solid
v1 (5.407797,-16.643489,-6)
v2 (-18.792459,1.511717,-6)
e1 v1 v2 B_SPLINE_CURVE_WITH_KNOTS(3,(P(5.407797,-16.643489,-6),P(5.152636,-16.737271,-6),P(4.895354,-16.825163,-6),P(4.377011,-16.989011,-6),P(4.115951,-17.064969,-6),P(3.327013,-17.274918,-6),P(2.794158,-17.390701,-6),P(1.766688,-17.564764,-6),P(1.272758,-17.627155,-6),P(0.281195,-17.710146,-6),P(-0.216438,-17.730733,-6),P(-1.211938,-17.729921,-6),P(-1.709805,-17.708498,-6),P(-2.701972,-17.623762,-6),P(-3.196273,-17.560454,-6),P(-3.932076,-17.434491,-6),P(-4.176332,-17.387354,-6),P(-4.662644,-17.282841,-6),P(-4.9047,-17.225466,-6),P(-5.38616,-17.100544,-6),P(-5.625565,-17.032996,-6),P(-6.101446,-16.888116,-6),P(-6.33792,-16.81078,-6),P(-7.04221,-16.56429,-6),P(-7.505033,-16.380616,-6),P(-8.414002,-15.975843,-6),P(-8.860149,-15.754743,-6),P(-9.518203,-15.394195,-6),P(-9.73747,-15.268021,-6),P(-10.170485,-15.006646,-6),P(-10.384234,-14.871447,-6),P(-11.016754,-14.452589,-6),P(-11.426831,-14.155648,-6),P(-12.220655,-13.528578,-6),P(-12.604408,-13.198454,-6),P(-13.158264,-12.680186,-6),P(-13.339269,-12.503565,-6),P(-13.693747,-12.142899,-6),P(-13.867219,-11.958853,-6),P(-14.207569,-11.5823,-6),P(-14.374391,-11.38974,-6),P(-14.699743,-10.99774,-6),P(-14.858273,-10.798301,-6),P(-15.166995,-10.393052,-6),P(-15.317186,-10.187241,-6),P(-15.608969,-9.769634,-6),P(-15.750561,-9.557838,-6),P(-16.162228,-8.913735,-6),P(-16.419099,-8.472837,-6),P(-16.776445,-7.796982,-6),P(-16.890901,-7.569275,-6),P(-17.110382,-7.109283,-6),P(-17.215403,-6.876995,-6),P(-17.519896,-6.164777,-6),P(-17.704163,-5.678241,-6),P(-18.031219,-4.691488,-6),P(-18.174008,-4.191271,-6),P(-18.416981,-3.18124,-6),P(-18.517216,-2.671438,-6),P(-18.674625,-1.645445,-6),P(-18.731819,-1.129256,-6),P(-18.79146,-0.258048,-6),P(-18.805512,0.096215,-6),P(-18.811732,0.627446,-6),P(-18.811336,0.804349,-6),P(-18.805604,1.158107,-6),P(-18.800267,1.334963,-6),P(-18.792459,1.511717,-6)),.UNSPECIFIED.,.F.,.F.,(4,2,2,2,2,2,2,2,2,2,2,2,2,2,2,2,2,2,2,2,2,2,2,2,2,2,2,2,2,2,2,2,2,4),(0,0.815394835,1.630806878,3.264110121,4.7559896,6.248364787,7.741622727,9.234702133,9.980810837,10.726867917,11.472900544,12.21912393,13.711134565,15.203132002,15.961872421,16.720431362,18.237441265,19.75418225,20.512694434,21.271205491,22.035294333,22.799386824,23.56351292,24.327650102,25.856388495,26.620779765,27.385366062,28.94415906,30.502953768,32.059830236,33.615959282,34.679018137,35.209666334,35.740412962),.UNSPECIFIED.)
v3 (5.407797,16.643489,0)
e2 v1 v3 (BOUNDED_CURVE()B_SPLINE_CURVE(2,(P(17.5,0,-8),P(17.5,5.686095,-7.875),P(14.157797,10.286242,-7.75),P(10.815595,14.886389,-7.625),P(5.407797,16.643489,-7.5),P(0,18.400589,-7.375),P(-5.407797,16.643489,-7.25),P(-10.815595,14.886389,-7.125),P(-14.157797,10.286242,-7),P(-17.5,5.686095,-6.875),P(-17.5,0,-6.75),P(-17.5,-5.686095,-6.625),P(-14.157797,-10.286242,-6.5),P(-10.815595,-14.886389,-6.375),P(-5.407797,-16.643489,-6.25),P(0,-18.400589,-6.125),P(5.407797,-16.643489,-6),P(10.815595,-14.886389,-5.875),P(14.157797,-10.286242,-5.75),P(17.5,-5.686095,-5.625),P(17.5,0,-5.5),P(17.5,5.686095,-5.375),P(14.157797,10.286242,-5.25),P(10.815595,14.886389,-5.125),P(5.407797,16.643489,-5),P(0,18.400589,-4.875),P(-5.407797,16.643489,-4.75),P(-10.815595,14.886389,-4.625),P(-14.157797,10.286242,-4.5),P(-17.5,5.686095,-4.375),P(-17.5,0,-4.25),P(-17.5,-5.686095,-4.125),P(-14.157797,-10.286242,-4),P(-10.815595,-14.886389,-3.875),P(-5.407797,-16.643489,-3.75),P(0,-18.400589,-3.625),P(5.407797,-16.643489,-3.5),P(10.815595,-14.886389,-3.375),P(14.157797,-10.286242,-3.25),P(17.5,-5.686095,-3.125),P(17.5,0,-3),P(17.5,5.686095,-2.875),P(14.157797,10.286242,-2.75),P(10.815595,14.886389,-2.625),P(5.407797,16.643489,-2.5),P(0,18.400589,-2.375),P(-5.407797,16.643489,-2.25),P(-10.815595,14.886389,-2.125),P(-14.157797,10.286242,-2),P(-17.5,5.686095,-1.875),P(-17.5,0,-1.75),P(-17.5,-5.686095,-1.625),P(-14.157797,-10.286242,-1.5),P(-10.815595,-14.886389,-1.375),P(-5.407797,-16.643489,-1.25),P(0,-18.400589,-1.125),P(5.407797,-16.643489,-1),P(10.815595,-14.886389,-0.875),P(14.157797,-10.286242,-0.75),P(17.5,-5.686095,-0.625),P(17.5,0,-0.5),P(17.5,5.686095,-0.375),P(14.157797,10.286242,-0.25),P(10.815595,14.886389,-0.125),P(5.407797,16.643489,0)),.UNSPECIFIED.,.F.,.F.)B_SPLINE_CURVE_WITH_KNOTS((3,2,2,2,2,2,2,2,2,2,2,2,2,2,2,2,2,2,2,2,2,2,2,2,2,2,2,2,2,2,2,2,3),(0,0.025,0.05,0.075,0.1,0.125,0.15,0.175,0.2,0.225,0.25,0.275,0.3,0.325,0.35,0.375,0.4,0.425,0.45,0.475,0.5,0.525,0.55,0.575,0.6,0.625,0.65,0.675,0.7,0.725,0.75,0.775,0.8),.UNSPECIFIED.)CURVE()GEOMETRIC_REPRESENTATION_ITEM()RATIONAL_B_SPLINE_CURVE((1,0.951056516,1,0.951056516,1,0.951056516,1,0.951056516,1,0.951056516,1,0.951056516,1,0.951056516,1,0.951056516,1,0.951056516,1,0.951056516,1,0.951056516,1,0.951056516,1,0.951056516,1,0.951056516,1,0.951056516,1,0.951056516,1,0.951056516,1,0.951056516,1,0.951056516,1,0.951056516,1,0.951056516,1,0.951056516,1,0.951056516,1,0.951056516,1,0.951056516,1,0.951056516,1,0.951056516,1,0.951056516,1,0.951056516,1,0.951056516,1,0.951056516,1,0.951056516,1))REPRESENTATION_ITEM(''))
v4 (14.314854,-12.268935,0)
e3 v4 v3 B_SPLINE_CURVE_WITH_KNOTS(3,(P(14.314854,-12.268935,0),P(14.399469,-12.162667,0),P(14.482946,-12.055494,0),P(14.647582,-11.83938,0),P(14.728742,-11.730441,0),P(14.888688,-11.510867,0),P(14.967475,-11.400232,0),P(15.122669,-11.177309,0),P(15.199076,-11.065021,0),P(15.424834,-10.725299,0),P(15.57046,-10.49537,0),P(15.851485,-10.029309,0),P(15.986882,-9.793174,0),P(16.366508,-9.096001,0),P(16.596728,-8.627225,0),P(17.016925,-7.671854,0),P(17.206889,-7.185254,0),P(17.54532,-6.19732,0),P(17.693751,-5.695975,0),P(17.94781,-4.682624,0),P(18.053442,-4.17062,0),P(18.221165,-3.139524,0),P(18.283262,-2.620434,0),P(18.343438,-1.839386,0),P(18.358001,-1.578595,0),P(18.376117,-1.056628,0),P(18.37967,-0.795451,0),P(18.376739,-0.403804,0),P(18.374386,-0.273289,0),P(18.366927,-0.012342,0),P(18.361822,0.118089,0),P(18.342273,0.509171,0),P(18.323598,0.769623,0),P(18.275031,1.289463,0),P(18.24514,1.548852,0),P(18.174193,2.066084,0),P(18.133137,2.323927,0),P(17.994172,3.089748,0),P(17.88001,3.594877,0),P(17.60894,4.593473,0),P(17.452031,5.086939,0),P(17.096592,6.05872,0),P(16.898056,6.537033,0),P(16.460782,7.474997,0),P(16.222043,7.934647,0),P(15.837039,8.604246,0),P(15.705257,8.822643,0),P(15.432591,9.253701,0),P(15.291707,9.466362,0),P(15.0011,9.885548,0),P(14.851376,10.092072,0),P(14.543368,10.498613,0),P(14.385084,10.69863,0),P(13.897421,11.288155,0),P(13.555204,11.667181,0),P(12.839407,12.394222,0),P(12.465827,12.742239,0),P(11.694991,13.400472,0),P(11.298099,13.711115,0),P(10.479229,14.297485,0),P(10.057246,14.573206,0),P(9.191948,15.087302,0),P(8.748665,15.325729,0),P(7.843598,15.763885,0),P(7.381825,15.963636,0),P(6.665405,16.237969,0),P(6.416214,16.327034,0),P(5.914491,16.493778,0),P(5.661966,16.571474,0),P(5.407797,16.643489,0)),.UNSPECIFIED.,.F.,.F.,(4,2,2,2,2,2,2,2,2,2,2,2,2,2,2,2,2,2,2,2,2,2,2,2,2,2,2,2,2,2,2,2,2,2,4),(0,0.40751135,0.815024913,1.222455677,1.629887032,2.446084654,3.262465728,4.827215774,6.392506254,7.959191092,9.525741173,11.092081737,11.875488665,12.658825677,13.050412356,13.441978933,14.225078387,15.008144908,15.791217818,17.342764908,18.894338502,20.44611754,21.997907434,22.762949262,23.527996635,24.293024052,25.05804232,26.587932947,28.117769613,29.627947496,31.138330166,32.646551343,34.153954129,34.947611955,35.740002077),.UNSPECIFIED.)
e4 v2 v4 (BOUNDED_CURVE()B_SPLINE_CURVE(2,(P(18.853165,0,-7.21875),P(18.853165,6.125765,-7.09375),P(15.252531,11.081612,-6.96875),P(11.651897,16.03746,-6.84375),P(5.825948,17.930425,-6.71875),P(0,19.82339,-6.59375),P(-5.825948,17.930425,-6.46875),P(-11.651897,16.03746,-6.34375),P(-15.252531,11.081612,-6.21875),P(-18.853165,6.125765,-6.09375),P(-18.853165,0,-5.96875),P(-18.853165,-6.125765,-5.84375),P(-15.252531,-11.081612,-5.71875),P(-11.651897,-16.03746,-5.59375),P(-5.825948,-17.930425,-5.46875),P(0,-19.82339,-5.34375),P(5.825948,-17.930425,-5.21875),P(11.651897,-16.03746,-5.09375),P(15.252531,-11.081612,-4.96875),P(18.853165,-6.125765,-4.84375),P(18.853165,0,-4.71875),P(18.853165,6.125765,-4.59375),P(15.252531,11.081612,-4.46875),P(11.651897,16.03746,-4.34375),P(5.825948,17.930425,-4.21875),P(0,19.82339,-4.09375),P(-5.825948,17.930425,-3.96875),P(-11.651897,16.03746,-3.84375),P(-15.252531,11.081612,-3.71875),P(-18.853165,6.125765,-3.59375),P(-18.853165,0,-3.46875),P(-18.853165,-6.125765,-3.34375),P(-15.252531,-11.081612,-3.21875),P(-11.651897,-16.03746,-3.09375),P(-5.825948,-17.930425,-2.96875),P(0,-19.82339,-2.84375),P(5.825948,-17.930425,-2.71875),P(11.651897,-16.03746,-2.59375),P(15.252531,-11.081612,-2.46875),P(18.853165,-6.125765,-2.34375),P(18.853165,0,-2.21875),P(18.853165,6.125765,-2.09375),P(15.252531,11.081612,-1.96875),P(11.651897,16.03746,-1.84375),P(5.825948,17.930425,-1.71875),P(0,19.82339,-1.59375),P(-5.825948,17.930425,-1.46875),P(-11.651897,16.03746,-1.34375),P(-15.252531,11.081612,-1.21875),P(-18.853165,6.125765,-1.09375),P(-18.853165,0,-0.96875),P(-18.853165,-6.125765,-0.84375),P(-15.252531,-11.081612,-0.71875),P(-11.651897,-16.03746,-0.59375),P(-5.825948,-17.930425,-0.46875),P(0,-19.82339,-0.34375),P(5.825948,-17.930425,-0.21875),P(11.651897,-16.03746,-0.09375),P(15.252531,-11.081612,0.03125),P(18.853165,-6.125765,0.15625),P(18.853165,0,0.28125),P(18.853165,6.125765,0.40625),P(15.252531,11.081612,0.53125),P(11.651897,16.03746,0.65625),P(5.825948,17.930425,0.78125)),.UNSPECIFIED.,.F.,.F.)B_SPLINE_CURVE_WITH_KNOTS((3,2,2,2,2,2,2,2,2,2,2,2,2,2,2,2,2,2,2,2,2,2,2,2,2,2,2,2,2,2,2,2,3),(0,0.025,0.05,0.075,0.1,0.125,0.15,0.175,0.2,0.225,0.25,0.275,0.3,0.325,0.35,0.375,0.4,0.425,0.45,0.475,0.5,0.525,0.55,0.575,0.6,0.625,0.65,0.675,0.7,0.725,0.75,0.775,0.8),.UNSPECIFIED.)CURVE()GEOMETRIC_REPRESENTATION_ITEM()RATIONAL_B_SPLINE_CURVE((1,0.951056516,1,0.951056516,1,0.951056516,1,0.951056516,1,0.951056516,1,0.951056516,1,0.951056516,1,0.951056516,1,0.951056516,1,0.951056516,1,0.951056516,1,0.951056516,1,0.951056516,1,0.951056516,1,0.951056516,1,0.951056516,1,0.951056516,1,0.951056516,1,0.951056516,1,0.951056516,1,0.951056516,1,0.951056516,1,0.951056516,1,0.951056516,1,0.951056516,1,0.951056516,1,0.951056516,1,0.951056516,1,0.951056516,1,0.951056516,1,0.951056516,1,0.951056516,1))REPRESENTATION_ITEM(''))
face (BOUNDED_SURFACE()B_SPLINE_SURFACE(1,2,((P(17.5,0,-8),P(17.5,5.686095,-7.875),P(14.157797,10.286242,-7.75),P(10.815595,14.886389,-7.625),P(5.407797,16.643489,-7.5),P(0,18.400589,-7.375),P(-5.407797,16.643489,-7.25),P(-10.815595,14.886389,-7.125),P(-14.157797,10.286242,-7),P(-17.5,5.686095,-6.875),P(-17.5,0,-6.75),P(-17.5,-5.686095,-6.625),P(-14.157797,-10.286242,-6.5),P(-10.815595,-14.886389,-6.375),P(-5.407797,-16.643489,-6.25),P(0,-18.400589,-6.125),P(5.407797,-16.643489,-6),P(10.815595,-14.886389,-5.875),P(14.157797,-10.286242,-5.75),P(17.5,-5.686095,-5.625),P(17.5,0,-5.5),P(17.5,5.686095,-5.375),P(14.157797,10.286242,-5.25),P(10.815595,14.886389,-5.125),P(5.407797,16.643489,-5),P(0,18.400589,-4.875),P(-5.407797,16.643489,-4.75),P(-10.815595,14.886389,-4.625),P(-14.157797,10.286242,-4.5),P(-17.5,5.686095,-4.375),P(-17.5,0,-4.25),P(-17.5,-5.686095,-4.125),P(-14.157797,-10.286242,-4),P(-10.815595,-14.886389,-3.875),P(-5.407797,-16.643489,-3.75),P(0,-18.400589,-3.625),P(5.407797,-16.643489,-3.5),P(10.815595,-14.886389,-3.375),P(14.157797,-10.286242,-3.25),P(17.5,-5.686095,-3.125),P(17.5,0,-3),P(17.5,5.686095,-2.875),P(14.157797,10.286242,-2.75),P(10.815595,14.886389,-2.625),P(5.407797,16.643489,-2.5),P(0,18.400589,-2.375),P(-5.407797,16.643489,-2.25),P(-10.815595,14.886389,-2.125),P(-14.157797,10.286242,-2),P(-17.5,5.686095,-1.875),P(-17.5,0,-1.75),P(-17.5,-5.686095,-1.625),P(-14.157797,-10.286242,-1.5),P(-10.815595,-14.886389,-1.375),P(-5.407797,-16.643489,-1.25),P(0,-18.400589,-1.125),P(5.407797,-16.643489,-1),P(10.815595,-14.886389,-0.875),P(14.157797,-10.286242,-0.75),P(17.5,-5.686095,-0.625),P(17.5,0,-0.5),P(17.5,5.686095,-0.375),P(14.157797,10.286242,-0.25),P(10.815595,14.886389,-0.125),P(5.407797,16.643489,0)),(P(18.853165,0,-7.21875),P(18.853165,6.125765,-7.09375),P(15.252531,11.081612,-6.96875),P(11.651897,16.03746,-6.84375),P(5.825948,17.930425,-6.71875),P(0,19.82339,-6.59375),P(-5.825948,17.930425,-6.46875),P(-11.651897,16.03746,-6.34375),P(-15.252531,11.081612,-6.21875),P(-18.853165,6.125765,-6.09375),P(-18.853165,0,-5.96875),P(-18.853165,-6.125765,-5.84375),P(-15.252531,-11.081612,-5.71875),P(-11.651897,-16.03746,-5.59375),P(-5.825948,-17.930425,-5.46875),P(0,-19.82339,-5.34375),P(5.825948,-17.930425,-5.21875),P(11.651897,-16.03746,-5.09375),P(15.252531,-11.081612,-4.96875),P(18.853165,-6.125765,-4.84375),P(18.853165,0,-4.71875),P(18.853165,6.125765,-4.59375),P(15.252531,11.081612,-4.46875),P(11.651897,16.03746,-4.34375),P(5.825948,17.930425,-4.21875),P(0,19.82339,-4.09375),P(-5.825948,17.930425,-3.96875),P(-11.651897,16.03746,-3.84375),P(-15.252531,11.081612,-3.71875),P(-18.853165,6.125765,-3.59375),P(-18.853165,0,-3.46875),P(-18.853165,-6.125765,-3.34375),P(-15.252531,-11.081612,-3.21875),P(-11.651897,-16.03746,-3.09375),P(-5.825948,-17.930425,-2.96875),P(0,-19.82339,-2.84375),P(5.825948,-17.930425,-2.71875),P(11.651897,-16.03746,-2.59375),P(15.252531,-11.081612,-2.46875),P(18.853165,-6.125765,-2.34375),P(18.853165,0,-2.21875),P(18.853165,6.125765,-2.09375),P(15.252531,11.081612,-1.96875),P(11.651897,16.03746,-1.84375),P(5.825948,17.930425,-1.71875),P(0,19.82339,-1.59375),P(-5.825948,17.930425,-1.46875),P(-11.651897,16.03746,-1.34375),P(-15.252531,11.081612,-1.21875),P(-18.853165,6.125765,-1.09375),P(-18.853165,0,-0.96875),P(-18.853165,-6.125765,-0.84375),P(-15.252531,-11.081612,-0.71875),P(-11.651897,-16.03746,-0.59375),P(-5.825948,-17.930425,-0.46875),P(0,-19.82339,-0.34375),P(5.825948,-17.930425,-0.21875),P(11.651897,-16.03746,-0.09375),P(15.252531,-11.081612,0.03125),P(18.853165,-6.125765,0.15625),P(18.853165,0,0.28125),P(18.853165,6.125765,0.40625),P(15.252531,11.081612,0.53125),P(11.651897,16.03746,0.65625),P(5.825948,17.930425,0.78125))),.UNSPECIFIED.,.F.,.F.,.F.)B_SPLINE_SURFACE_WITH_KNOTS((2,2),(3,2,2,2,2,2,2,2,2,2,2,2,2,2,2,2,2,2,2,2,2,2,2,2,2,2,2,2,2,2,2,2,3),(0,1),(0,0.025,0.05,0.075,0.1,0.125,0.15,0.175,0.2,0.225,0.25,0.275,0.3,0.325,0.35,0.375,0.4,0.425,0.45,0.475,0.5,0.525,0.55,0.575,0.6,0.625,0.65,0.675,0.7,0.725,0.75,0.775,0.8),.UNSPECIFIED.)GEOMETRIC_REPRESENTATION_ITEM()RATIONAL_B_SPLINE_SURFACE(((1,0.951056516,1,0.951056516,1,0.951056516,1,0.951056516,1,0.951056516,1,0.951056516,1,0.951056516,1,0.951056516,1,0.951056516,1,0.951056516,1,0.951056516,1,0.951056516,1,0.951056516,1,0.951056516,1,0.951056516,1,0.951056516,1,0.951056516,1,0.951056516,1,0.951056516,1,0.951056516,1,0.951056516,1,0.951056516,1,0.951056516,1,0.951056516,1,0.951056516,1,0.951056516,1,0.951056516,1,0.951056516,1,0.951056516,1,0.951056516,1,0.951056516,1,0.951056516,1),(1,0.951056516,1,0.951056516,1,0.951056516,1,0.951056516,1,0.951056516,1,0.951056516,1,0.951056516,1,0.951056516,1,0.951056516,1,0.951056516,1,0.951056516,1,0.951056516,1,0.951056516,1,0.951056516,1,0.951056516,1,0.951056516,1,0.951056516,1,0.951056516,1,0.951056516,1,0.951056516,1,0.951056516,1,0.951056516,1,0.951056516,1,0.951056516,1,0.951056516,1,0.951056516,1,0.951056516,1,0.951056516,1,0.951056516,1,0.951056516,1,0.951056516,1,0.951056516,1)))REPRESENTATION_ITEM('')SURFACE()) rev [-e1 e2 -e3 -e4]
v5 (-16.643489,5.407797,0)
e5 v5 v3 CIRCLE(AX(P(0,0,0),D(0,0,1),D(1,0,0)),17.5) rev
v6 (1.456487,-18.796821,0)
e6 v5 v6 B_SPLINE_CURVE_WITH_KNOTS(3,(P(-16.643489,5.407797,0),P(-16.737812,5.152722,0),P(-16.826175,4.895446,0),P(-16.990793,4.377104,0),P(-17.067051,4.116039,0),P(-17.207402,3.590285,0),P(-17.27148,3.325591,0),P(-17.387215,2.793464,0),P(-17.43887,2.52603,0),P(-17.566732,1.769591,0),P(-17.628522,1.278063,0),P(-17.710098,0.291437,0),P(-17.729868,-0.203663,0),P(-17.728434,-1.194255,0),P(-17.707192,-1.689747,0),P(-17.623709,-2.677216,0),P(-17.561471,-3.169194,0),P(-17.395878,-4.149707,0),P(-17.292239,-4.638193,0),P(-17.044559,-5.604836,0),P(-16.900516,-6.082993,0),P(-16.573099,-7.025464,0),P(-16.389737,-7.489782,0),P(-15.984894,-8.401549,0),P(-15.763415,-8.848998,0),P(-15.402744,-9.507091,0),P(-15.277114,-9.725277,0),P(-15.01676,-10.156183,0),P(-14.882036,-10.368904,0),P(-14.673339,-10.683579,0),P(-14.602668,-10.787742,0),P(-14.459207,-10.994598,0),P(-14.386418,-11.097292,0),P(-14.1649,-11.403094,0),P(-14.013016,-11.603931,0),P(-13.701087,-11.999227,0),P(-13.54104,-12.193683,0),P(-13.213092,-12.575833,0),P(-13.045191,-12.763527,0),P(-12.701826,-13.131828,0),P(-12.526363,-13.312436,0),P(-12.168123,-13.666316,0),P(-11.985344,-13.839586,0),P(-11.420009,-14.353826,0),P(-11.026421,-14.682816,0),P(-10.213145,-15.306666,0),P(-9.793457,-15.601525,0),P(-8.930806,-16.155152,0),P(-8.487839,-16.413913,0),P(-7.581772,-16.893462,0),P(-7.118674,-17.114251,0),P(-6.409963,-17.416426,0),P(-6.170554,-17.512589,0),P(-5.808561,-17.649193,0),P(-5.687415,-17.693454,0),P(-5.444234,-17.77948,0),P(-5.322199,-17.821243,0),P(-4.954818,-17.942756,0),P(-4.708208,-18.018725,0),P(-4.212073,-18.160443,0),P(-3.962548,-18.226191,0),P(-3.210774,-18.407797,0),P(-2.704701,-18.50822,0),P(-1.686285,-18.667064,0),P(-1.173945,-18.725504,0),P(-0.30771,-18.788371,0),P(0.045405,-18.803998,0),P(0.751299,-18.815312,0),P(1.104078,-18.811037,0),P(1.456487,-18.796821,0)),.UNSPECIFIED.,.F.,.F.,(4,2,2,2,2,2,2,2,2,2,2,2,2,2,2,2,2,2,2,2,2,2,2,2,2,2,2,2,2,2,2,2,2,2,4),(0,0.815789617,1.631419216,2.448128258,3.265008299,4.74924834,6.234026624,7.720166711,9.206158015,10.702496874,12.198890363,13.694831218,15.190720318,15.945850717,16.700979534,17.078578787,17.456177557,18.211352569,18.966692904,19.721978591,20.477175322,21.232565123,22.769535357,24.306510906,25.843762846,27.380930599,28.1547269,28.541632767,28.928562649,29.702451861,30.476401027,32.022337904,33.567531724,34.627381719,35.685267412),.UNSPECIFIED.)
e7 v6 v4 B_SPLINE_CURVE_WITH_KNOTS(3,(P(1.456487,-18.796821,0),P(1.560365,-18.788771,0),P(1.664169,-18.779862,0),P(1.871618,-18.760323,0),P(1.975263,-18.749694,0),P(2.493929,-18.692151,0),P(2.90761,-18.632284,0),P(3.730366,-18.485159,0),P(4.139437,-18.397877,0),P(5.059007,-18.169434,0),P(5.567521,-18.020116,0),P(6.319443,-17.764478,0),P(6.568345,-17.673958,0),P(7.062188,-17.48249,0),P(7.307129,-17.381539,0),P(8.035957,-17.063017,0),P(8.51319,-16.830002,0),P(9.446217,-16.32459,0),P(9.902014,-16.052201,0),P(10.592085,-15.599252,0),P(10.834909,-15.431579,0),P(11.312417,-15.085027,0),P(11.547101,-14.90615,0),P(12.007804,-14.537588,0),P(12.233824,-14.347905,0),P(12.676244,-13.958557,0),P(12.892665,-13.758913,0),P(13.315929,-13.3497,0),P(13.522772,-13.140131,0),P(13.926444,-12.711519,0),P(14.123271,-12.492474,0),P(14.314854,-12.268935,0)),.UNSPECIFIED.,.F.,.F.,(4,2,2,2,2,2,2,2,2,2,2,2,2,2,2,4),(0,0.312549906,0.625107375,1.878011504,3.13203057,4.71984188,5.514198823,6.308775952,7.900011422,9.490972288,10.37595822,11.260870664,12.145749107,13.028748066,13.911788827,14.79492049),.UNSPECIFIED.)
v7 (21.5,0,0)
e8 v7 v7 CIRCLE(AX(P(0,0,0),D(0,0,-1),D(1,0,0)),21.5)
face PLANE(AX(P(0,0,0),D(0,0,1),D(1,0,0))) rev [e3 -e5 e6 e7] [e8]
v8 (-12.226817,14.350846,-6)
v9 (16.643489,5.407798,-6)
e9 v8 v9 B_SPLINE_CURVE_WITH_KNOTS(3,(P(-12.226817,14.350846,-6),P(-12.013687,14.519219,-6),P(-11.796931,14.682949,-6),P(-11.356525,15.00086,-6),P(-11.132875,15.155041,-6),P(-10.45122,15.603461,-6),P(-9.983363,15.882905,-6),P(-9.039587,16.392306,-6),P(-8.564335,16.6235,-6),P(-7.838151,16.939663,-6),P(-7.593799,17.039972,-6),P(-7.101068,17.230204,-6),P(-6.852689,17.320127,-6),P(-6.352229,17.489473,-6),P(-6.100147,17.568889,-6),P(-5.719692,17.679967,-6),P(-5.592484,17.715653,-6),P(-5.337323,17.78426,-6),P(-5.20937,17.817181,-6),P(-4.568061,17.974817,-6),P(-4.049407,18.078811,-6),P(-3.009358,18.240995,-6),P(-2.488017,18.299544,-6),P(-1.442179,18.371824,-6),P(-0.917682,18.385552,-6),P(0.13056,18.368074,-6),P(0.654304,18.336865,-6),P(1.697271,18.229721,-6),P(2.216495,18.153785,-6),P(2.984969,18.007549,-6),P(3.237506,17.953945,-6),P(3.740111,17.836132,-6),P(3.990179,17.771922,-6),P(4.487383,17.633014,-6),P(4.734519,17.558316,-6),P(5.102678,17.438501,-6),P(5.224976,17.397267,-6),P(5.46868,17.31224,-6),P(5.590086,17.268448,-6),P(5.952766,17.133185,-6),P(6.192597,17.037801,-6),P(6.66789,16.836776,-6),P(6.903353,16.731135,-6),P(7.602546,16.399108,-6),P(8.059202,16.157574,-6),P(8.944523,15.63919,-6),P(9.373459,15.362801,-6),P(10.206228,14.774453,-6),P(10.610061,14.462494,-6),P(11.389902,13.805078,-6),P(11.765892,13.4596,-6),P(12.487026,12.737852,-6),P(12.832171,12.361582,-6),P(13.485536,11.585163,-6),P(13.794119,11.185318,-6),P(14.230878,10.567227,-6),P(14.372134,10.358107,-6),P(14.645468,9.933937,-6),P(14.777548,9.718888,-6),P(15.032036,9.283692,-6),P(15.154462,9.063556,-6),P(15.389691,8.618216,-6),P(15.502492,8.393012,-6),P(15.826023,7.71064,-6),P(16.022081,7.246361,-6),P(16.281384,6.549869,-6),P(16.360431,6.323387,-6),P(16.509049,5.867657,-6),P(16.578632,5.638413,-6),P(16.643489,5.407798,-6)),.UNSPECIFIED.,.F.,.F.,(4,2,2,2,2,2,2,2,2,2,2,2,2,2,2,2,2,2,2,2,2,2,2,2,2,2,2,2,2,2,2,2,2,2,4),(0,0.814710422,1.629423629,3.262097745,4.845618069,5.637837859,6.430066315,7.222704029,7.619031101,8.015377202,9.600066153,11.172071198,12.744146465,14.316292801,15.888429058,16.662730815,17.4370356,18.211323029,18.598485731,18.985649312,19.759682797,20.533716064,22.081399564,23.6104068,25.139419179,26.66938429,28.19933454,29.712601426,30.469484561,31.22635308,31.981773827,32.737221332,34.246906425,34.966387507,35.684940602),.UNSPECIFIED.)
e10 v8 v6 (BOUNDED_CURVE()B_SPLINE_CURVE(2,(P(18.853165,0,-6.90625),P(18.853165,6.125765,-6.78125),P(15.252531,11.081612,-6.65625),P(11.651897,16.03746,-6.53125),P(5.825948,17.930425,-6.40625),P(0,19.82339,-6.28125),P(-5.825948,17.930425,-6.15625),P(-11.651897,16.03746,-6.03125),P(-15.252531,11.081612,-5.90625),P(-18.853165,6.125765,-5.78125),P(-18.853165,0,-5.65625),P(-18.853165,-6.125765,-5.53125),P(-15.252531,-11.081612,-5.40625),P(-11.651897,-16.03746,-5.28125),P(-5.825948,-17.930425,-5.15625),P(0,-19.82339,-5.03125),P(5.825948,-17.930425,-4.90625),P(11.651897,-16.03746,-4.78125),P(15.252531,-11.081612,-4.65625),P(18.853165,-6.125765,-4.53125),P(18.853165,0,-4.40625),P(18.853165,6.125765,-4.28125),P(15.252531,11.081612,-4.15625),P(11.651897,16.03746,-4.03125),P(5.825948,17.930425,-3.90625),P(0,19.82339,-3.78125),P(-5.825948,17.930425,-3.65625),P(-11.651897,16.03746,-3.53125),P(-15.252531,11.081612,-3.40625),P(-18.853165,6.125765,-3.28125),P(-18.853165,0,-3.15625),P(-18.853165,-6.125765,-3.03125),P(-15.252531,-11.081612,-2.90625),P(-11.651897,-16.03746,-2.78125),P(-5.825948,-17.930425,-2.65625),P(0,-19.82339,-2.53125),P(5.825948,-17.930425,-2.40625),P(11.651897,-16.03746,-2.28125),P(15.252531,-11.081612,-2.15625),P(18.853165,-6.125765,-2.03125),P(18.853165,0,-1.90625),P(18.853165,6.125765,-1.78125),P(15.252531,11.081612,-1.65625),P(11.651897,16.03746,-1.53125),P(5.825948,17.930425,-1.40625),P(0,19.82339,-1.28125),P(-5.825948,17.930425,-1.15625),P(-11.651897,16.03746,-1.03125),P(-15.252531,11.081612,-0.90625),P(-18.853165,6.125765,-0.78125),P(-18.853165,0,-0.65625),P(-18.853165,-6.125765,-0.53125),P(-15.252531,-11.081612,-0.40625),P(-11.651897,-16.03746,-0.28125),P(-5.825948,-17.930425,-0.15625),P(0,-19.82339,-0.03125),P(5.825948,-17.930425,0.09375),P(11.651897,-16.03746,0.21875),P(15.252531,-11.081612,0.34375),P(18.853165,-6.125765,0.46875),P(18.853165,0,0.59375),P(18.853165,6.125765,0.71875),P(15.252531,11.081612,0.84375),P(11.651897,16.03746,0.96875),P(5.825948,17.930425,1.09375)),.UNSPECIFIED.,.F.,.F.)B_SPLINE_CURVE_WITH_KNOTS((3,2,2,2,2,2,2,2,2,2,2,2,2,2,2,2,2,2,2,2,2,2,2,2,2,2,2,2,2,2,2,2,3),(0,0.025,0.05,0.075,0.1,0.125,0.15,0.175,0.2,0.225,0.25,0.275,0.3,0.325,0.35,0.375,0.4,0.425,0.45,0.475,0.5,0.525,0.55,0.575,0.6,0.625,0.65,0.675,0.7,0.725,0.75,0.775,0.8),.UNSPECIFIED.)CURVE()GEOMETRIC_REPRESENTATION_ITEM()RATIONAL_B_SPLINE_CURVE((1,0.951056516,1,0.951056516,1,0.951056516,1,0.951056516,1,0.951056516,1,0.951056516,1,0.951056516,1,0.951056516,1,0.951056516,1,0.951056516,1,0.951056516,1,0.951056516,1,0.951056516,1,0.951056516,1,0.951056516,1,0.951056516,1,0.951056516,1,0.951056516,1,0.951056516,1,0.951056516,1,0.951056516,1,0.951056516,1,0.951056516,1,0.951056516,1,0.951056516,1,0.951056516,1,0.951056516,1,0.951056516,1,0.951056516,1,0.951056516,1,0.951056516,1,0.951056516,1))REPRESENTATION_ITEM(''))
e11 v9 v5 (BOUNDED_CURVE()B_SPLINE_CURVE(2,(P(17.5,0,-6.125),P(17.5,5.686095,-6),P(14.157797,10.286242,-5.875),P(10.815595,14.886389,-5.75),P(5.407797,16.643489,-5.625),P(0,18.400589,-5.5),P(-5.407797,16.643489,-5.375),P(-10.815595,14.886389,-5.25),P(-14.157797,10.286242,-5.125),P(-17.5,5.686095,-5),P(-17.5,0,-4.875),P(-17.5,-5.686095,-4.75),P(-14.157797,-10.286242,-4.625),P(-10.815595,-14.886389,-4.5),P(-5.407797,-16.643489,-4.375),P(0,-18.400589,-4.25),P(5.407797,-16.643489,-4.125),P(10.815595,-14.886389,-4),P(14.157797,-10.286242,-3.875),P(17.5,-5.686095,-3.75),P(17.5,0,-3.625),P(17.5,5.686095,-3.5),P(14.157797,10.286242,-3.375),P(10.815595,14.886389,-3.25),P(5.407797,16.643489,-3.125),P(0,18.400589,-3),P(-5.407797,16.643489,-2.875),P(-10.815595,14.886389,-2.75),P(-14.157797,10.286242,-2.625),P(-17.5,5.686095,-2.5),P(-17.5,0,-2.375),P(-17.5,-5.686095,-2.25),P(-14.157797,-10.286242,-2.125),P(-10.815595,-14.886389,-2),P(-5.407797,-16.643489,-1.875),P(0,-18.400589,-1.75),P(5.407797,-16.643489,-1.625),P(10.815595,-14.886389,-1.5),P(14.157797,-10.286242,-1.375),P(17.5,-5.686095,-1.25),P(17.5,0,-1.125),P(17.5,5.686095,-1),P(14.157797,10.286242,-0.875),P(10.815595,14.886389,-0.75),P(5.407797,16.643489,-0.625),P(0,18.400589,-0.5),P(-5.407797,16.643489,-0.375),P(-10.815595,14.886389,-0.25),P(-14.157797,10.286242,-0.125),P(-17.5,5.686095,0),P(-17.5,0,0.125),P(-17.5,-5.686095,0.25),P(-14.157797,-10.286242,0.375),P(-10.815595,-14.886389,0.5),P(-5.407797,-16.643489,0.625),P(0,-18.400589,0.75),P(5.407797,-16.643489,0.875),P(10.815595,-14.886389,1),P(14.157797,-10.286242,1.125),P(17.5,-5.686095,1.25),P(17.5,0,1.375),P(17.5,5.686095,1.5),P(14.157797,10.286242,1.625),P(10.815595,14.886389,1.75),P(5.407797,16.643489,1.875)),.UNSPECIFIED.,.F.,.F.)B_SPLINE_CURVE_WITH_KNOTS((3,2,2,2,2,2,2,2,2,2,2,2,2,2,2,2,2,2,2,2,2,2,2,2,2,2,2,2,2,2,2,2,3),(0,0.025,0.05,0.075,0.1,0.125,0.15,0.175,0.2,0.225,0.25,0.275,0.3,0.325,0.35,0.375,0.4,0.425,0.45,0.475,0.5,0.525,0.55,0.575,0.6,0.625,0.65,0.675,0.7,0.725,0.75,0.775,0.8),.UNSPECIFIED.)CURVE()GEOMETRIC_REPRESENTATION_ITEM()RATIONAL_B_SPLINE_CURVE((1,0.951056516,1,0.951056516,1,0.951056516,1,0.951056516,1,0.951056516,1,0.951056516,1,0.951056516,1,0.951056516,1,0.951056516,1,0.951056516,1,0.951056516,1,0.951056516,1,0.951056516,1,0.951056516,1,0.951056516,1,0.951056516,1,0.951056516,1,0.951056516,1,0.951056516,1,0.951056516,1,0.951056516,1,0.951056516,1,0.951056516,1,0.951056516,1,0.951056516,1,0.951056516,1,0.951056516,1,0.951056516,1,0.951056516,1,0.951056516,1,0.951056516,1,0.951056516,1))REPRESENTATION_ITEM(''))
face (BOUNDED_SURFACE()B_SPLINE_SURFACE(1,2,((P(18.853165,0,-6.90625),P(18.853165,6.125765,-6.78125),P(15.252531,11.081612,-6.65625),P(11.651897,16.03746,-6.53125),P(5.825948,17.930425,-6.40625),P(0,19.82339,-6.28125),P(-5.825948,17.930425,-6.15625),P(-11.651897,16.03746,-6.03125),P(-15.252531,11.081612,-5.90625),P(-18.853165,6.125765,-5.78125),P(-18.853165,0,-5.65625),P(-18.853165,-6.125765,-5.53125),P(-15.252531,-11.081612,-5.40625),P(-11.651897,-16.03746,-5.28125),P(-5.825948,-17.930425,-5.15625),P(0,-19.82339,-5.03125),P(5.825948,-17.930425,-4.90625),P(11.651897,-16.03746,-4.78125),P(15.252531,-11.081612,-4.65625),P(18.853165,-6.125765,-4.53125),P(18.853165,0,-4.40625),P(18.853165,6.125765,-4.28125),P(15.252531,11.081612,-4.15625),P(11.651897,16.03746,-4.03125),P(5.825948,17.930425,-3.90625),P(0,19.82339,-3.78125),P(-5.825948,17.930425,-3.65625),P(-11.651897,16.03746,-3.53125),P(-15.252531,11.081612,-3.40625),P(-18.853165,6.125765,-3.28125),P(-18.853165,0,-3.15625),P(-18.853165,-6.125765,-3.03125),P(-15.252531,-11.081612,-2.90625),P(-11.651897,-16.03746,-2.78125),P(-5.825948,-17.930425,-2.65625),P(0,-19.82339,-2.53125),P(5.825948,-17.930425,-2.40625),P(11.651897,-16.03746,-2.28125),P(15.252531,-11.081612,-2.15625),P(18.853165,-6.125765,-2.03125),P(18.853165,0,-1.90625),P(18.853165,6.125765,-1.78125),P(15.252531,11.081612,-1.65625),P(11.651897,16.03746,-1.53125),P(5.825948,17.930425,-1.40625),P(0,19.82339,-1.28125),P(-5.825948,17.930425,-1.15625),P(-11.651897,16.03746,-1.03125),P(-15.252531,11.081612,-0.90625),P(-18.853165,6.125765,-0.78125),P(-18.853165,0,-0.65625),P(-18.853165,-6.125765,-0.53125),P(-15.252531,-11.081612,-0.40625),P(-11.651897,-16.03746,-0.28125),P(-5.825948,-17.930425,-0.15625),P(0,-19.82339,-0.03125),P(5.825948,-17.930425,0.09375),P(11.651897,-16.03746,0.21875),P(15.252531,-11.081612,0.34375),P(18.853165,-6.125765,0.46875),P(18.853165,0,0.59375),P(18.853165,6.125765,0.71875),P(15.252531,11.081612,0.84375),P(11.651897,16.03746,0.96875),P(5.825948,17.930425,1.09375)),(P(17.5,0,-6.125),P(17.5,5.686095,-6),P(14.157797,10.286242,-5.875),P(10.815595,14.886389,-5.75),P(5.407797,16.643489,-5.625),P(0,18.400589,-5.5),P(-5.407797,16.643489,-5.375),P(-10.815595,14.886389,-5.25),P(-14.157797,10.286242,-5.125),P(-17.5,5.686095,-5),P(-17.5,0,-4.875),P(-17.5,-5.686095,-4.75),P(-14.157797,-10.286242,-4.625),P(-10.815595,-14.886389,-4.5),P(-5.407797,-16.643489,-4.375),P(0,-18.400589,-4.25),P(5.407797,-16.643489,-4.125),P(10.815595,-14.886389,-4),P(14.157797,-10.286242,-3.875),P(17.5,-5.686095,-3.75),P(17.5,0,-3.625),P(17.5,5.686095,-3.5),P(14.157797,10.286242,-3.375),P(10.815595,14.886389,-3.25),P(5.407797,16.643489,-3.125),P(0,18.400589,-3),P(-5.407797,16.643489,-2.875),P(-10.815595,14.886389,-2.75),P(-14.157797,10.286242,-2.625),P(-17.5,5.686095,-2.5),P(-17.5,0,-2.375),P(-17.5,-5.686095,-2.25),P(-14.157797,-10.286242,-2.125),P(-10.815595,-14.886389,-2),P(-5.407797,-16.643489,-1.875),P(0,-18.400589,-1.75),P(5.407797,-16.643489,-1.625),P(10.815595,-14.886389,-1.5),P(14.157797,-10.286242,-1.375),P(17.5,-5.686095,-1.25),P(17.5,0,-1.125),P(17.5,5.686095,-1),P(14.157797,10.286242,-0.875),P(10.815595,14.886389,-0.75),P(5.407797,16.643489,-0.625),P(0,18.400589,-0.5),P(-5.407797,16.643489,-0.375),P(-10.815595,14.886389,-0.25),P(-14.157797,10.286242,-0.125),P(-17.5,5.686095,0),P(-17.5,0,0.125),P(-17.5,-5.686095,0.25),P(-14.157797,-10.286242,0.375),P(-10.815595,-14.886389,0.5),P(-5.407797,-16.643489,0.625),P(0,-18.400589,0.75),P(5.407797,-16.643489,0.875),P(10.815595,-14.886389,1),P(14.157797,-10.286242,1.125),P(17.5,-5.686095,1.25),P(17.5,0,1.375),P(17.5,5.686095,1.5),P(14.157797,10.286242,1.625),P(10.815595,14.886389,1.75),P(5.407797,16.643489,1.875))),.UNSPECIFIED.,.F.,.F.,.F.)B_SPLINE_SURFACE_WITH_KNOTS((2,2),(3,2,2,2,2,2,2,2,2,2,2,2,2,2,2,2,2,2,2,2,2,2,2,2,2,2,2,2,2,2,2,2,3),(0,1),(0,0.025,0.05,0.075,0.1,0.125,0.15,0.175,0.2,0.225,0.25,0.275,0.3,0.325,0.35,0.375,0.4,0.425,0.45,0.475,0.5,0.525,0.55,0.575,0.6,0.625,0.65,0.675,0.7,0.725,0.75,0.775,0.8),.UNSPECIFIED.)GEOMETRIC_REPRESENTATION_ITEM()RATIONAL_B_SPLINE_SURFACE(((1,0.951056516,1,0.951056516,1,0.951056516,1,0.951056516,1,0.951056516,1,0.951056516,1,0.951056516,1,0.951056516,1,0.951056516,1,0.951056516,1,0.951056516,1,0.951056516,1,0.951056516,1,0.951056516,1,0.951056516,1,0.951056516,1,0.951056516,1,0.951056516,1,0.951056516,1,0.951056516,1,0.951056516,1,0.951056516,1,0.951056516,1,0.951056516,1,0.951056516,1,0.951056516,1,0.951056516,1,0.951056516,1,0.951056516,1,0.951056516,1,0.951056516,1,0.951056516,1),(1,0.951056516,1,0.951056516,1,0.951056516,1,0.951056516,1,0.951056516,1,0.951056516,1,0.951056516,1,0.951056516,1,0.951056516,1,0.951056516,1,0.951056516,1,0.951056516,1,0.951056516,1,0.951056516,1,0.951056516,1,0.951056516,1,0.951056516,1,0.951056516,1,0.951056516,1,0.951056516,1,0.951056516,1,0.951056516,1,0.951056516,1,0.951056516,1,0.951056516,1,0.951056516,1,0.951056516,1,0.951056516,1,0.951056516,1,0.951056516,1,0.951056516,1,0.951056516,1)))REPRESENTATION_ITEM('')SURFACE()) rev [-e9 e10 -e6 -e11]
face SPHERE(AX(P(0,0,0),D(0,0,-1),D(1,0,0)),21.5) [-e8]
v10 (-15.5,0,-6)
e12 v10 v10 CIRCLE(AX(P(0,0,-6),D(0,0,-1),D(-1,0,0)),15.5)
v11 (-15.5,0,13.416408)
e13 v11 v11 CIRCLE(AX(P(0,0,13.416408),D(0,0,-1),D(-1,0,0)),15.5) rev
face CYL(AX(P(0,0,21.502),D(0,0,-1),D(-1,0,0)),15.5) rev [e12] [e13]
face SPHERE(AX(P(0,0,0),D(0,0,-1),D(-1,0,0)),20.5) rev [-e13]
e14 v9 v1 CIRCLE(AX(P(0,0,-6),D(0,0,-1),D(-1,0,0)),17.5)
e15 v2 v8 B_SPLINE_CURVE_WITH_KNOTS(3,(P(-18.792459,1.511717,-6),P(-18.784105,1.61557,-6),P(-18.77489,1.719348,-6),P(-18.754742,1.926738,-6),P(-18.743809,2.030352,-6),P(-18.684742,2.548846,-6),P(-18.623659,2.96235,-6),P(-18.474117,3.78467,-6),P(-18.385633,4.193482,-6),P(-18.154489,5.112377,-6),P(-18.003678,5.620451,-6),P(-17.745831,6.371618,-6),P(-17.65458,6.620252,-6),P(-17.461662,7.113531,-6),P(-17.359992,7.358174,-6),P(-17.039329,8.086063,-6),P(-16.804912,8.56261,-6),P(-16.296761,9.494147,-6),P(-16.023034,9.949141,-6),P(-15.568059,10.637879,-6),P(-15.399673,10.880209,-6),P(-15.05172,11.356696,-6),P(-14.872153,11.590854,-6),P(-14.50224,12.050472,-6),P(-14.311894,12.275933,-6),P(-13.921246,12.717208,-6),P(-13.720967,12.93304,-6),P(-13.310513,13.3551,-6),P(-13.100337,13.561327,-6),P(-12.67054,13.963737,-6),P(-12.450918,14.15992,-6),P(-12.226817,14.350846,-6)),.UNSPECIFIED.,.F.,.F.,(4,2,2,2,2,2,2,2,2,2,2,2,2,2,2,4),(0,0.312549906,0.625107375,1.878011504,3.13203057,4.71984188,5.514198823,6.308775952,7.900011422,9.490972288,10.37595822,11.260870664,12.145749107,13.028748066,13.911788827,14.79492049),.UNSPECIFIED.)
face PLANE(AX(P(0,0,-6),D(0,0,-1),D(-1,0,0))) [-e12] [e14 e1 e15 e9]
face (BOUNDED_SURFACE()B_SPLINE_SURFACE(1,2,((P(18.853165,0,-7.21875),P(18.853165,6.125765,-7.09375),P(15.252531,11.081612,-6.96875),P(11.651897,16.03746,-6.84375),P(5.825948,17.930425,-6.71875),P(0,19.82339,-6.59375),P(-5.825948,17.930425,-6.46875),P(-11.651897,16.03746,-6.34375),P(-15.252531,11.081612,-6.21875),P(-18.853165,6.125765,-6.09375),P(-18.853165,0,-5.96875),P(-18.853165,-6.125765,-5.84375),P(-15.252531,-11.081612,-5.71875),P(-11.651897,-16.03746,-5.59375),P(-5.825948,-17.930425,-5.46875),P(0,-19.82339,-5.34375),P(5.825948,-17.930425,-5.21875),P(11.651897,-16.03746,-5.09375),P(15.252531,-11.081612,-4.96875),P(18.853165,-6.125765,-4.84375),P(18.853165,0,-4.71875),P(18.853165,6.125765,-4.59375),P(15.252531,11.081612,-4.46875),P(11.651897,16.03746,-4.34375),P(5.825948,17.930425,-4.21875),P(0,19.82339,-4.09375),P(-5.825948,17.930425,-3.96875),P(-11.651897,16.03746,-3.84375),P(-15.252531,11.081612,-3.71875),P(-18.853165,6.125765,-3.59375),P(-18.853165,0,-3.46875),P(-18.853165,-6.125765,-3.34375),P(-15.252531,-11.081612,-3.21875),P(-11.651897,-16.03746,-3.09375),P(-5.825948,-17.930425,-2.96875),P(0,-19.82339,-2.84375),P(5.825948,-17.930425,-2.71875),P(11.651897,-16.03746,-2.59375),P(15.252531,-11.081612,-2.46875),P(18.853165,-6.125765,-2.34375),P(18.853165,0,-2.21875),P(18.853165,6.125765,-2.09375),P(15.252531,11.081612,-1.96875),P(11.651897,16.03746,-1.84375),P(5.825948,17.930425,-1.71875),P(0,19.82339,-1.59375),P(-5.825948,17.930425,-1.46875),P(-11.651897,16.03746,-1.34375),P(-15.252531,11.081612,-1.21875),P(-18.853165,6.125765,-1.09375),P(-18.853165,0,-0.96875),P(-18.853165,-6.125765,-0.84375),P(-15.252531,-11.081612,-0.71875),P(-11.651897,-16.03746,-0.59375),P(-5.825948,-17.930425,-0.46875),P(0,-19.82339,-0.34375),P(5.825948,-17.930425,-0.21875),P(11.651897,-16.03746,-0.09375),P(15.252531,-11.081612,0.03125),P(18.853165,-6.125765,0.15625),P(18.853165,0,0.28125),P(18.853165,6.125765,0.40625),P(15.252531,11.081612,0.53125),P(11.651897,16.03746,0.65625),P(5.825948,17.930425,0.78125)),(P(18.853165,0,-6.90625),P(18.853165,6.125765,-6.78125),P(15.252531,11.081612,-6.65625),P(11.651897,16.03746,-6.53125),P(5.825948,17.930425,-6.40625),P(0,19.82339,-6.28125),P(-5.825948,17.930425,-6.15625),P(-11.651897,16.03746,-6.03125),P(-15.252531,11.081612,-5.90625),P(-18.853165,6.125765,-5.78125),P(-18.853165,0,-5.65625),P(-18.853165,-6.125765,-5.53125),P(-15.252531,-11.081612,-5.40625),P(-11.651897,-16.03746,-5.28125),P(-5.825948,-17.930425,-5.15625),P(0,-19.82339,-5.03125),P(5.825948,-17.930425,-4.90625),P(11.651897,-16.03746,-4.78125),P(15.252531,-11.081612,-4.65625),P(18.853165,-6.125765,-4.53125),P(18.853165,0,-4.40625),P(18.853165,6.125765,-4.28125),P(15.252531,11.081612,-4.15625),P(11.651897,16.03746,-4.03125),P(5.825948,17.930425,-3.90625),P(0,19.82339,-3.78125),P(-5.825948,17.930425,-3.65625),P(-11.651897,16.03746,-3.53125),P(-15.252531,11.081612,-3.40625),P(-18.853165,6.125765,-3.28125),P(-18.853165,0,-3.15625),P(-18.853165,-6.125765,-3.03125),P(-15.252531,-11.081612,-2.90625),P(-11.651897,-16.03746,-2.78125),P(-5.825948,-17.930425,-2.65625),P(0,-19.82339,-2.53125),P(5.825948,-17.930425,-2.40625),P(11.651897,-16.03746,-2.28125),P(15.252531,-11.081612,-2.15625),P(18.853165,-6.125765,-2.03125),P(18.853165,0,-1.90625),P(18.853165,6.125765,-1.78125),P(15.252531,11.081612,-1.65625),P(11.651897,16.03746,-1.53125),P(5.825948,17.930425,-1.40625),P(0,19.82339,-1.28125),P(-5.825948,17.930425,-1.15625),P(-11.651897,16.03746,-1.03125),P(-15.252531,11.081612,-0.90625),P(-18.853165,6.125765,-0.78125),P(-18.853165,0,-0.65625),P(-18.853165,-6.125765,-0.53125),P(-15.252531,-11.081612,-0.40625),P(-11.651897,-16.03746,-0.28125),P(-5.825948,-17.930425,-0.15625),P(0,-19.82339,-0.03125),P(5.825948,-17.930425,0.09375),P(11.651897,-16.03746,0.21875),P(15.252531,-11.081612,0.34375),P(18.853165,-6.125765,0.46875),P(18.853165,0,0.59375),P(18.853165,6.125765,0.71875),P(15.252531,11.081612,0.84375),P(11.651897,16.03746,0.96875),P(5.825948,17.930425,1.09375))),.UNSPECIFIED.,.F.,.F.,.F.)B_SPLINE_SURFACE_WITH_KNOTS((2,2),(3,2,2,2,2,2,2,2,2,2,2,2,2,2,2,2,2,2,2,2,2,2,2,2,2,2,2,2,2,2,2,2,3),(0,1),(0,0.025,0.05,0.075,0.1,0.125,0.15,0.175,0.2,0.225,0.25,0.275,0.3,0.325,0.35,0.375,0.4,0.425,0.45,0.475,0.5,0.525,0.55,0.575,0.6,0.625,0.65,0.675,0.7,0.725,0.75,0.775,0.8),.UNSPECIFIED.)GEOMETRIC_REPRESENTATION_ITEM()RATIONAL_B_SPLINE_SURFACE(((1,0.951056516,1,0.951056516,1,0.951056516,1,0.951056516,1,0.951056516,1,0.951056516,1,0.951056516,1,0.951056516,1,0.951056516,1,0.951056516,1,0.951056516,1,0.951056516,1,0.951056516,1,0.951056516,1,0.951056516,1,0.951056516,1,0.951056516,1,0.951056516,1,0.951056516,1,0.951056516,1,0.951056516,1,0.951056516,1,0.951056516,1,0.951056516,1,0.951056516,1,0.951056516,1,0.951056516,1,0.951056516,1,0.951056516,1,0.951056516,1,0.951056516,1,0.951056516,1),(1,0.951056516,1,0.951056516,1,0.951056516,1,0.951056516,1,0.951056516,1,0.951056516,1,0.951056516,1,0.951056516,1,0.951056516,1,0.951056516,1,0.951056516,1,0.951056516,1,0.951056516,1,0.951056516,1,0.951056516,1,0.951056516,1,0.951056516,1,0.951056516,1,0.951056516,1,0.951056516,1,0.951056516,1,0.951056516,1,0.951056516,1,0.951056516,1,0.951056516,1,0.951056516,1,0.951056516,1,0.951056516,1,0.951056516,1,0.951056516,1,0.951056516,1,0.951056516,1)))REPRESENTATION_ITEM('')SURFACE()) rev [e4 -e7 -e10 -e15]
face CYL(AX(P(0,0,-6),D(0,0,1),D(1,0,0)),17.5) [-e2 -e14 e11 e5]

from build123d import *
from build123d.topology import SkipClean

# Parameters (mm, degrees)
REVOLVE1_ANGLE           = 180
SHELL1_T                 = -1
BOSS_EXTRUDE1_REACH      = 39.239
BOSS_EXTRUDE1_END_RADIUS = 20.5
SKETCH2_R                = 20.5
SKETCH2_R_2              = 15.5
BOSS_EXTRUDE2_START      = 6
SKETCH4_R                = 17.5
SKETCH4_R_2              = 15.5
BOSS_EXTRUDE2_DEPTH      = 6
THREAD1_PITCH            = 2.5
THREAD1_FROM             = 2


with BuildPart() as part:
    # Sketch1 → Revolve1 (revolve)
    with BuildSketch(Plane.XY):
        with BuildLine():
            Line((0, 21.5), (0, -21.5))
            ThreePointArc((0, -21.5), (21.5, 0), (0, 21.5))
        make_face()
    revolve(axis=Axis((0, 21.5, 0), (0, -1, 0)), revolution_arc=REVOLVE1_ANGLE)

    # Shell1
    shell1_openings = [part.faces().sort_by_distance(p)[0] for p in [
        (0, 0, 0),
    ]]
    offset(amount=SHELL1_T, openings=shell1_openings)

    # Boss-Extrude1: up to this sphere (the profile starts inside it)
    with SkipClean():  # the faces are left unmerged after this step: merging them gives an invalid solid
        boss_extrude1_end = Location((0, 0, 0)) * Sphere(BOSS_EXTRUDE1_END_RADIUS, mode=Mode.PRIVATE)
        # Sketch2 → Boss-Extrude1 (add, up to the surface)
        with BuildSketch(Plane(origin=(0, 0, 0), x_dir=(-1, 0, 0), z_dir=(0, 0, -1)), mode=Mode.PRIVATE) as boss_extrude1_sk1:
            Circle(SKETCH2_R)
            Circle(SKETCH2_R_2, mode=Mode.SUBTRACT)
        boss_extrude1_tool1 = extrude(boss_extrude1_sk1.sketch, amount=-BOSS_EXTRUDE1_REACH, mode=Mode.PRIVATE) & boss_extrude1_end
        add(boss_extrude1_tool1.solids().sort_by_distance((19.920172, 0, 0))[0])

    # Sketch4 → Boss-Extrude2 (add)
    with SkipClean():  # the faces are left unmerged after this step: merging them gives an invalid solid
        with BuildSketch(Plane(origin=(0, 0, 0), x_dir=(-1, 0, 0), z_dir=(0, 0, -1)).offset(BOSS_EXTRUDE2_START)):
            with Locations(Location((0, 0, 0), (0, 0, 180))):
                Circle(SKETCH4_R)
            Circle(SKETCH4_R_2, mode=Mode.SUBTRACT)
        extrude(amount=-BOSS_EXTRUDE2_DEPTH)

    # Thread1: arcs per turn and ends read off the stored shape
    # Thread1: the profile of Thread Profile1 profile screwed along a right-hand helix through 3.2 turns, 10 arcs to a turn; built about Z, then put on its axis
    with SkipClean():  # the faces are left unmerged after this step: merging them gives an invalid solid
        thread1_z = Axis((0, 0, 0), (0, 0, 1))
        thread1_corners = [(17.4997, 0, -0.000173205), (18.853164688, 0, 0.781249997), (18.853164688, 0, 1.093749997), (17.4997, 0, 1.875173198)]
        with BuildLine(mode=Mode.PRIVATE) as thread1_profile:
            Line(thread1_corners[0], thread1_corners[1])
            Line(thread1_corners[1], thread1_corners[2])
            Line(thread1_corners[2], thread1_corners[3])
            Line(thread1_corners[3], thread1_corners[0])
        thread1_cap = Face(thread1_profile.wire())
        thread1_turn_angles = [0, 18, 36, 54, 72, 90, 108, 126, 144, 162, 180, 198, 216, 234, 252, 270, 288, 306, 324, 342, 360]
        thread1_turn_weights = [1, 0.9510565162951535, 1, 0.9510565162951535, 1, 0.9510565162951535, 1, 0.9510565162951535, 1, 0.9510565162951535, 1, 0.9510565162951535, 1, 0.9510565162951535, 1, 0.9510565162951535, 1, 0.9510565162951535, 1, 0.9510565162951535, 1]
        thread1_turn_rails = [Edge.make_bspline([Vector(p[0], p[1], 0).rotate(thread1_z, thread1_turn_angles[k]) / thread1_turn_weights[k] + Vector(0, 0, p[2] + THREAD1_PITCH * thread1_turn_angles[k] / 360) for k in range(21)], [0, 0, 0, 1, 1, 2, 2, 3, 3, 4, 4, 5, 5, 6, 6, 7, 7, 8, 8, 9, 9, 10, 10, 10], 2, thread1_turn_weights) for p in thread1_corners]
        thread1_turn_sides = [Face.make_surface_from_curves(thread1_turn_rails[p[0]], thread1_turn_rails[p[1]]) for p in [(0, 1), (1, 2), (2, 3), (3, 0)]]
        thread1_last_angles = [1080, 1098, 1116, 1134, 1152]
        thread1_last_weights = [1, 0.9510565162951535, 1, 0.9510565162951542, 1]
        thread1_last_rails = [Edge.make_bspline([Vector(p[0], p[1], 0).rotate(thread1_z, thread1_last_angles[k]) / thread1_last_weights[k] + Vector(0, 0, p[2] + THREAD1_PITCH * thread1_last_angles[k] / 360) for k in range(5)], [0, 0, 0, 1, 1, 2, 2, 2], 2, thread1_last_weights) for p in thread1_corners]
        thread1_last_sides = [Face.make_surface_from_curves(thread1_last_rails[p[0]], thread1_last_rails[p[1]]) for p in [(0, 1), (1, 2), (2, 3), (3, 0)]]
        thread1 = Plane(origin=(0, 0, -8), x_dir=(1, 0, 0), z_dir=(0, 0, 1)) * split(Solid(Shell([*[p.moved(Location((0, 0, THREAD1_PITCH * i))) for i in range(3) for p in thread1_turn_sides], *thread1_last_sides, thread1_cap, thread1_cap.rotate(thread1_z, 1152).moved(Location((0, 0, THREAD1_PITCH * 1152 / 360)))])), bisect_by=Plane.XY.offset(THREAD1_FROM), keep=Keep.TOP, mode=Mode.PRIVATE)
        add(thread1)


solid = part.part
